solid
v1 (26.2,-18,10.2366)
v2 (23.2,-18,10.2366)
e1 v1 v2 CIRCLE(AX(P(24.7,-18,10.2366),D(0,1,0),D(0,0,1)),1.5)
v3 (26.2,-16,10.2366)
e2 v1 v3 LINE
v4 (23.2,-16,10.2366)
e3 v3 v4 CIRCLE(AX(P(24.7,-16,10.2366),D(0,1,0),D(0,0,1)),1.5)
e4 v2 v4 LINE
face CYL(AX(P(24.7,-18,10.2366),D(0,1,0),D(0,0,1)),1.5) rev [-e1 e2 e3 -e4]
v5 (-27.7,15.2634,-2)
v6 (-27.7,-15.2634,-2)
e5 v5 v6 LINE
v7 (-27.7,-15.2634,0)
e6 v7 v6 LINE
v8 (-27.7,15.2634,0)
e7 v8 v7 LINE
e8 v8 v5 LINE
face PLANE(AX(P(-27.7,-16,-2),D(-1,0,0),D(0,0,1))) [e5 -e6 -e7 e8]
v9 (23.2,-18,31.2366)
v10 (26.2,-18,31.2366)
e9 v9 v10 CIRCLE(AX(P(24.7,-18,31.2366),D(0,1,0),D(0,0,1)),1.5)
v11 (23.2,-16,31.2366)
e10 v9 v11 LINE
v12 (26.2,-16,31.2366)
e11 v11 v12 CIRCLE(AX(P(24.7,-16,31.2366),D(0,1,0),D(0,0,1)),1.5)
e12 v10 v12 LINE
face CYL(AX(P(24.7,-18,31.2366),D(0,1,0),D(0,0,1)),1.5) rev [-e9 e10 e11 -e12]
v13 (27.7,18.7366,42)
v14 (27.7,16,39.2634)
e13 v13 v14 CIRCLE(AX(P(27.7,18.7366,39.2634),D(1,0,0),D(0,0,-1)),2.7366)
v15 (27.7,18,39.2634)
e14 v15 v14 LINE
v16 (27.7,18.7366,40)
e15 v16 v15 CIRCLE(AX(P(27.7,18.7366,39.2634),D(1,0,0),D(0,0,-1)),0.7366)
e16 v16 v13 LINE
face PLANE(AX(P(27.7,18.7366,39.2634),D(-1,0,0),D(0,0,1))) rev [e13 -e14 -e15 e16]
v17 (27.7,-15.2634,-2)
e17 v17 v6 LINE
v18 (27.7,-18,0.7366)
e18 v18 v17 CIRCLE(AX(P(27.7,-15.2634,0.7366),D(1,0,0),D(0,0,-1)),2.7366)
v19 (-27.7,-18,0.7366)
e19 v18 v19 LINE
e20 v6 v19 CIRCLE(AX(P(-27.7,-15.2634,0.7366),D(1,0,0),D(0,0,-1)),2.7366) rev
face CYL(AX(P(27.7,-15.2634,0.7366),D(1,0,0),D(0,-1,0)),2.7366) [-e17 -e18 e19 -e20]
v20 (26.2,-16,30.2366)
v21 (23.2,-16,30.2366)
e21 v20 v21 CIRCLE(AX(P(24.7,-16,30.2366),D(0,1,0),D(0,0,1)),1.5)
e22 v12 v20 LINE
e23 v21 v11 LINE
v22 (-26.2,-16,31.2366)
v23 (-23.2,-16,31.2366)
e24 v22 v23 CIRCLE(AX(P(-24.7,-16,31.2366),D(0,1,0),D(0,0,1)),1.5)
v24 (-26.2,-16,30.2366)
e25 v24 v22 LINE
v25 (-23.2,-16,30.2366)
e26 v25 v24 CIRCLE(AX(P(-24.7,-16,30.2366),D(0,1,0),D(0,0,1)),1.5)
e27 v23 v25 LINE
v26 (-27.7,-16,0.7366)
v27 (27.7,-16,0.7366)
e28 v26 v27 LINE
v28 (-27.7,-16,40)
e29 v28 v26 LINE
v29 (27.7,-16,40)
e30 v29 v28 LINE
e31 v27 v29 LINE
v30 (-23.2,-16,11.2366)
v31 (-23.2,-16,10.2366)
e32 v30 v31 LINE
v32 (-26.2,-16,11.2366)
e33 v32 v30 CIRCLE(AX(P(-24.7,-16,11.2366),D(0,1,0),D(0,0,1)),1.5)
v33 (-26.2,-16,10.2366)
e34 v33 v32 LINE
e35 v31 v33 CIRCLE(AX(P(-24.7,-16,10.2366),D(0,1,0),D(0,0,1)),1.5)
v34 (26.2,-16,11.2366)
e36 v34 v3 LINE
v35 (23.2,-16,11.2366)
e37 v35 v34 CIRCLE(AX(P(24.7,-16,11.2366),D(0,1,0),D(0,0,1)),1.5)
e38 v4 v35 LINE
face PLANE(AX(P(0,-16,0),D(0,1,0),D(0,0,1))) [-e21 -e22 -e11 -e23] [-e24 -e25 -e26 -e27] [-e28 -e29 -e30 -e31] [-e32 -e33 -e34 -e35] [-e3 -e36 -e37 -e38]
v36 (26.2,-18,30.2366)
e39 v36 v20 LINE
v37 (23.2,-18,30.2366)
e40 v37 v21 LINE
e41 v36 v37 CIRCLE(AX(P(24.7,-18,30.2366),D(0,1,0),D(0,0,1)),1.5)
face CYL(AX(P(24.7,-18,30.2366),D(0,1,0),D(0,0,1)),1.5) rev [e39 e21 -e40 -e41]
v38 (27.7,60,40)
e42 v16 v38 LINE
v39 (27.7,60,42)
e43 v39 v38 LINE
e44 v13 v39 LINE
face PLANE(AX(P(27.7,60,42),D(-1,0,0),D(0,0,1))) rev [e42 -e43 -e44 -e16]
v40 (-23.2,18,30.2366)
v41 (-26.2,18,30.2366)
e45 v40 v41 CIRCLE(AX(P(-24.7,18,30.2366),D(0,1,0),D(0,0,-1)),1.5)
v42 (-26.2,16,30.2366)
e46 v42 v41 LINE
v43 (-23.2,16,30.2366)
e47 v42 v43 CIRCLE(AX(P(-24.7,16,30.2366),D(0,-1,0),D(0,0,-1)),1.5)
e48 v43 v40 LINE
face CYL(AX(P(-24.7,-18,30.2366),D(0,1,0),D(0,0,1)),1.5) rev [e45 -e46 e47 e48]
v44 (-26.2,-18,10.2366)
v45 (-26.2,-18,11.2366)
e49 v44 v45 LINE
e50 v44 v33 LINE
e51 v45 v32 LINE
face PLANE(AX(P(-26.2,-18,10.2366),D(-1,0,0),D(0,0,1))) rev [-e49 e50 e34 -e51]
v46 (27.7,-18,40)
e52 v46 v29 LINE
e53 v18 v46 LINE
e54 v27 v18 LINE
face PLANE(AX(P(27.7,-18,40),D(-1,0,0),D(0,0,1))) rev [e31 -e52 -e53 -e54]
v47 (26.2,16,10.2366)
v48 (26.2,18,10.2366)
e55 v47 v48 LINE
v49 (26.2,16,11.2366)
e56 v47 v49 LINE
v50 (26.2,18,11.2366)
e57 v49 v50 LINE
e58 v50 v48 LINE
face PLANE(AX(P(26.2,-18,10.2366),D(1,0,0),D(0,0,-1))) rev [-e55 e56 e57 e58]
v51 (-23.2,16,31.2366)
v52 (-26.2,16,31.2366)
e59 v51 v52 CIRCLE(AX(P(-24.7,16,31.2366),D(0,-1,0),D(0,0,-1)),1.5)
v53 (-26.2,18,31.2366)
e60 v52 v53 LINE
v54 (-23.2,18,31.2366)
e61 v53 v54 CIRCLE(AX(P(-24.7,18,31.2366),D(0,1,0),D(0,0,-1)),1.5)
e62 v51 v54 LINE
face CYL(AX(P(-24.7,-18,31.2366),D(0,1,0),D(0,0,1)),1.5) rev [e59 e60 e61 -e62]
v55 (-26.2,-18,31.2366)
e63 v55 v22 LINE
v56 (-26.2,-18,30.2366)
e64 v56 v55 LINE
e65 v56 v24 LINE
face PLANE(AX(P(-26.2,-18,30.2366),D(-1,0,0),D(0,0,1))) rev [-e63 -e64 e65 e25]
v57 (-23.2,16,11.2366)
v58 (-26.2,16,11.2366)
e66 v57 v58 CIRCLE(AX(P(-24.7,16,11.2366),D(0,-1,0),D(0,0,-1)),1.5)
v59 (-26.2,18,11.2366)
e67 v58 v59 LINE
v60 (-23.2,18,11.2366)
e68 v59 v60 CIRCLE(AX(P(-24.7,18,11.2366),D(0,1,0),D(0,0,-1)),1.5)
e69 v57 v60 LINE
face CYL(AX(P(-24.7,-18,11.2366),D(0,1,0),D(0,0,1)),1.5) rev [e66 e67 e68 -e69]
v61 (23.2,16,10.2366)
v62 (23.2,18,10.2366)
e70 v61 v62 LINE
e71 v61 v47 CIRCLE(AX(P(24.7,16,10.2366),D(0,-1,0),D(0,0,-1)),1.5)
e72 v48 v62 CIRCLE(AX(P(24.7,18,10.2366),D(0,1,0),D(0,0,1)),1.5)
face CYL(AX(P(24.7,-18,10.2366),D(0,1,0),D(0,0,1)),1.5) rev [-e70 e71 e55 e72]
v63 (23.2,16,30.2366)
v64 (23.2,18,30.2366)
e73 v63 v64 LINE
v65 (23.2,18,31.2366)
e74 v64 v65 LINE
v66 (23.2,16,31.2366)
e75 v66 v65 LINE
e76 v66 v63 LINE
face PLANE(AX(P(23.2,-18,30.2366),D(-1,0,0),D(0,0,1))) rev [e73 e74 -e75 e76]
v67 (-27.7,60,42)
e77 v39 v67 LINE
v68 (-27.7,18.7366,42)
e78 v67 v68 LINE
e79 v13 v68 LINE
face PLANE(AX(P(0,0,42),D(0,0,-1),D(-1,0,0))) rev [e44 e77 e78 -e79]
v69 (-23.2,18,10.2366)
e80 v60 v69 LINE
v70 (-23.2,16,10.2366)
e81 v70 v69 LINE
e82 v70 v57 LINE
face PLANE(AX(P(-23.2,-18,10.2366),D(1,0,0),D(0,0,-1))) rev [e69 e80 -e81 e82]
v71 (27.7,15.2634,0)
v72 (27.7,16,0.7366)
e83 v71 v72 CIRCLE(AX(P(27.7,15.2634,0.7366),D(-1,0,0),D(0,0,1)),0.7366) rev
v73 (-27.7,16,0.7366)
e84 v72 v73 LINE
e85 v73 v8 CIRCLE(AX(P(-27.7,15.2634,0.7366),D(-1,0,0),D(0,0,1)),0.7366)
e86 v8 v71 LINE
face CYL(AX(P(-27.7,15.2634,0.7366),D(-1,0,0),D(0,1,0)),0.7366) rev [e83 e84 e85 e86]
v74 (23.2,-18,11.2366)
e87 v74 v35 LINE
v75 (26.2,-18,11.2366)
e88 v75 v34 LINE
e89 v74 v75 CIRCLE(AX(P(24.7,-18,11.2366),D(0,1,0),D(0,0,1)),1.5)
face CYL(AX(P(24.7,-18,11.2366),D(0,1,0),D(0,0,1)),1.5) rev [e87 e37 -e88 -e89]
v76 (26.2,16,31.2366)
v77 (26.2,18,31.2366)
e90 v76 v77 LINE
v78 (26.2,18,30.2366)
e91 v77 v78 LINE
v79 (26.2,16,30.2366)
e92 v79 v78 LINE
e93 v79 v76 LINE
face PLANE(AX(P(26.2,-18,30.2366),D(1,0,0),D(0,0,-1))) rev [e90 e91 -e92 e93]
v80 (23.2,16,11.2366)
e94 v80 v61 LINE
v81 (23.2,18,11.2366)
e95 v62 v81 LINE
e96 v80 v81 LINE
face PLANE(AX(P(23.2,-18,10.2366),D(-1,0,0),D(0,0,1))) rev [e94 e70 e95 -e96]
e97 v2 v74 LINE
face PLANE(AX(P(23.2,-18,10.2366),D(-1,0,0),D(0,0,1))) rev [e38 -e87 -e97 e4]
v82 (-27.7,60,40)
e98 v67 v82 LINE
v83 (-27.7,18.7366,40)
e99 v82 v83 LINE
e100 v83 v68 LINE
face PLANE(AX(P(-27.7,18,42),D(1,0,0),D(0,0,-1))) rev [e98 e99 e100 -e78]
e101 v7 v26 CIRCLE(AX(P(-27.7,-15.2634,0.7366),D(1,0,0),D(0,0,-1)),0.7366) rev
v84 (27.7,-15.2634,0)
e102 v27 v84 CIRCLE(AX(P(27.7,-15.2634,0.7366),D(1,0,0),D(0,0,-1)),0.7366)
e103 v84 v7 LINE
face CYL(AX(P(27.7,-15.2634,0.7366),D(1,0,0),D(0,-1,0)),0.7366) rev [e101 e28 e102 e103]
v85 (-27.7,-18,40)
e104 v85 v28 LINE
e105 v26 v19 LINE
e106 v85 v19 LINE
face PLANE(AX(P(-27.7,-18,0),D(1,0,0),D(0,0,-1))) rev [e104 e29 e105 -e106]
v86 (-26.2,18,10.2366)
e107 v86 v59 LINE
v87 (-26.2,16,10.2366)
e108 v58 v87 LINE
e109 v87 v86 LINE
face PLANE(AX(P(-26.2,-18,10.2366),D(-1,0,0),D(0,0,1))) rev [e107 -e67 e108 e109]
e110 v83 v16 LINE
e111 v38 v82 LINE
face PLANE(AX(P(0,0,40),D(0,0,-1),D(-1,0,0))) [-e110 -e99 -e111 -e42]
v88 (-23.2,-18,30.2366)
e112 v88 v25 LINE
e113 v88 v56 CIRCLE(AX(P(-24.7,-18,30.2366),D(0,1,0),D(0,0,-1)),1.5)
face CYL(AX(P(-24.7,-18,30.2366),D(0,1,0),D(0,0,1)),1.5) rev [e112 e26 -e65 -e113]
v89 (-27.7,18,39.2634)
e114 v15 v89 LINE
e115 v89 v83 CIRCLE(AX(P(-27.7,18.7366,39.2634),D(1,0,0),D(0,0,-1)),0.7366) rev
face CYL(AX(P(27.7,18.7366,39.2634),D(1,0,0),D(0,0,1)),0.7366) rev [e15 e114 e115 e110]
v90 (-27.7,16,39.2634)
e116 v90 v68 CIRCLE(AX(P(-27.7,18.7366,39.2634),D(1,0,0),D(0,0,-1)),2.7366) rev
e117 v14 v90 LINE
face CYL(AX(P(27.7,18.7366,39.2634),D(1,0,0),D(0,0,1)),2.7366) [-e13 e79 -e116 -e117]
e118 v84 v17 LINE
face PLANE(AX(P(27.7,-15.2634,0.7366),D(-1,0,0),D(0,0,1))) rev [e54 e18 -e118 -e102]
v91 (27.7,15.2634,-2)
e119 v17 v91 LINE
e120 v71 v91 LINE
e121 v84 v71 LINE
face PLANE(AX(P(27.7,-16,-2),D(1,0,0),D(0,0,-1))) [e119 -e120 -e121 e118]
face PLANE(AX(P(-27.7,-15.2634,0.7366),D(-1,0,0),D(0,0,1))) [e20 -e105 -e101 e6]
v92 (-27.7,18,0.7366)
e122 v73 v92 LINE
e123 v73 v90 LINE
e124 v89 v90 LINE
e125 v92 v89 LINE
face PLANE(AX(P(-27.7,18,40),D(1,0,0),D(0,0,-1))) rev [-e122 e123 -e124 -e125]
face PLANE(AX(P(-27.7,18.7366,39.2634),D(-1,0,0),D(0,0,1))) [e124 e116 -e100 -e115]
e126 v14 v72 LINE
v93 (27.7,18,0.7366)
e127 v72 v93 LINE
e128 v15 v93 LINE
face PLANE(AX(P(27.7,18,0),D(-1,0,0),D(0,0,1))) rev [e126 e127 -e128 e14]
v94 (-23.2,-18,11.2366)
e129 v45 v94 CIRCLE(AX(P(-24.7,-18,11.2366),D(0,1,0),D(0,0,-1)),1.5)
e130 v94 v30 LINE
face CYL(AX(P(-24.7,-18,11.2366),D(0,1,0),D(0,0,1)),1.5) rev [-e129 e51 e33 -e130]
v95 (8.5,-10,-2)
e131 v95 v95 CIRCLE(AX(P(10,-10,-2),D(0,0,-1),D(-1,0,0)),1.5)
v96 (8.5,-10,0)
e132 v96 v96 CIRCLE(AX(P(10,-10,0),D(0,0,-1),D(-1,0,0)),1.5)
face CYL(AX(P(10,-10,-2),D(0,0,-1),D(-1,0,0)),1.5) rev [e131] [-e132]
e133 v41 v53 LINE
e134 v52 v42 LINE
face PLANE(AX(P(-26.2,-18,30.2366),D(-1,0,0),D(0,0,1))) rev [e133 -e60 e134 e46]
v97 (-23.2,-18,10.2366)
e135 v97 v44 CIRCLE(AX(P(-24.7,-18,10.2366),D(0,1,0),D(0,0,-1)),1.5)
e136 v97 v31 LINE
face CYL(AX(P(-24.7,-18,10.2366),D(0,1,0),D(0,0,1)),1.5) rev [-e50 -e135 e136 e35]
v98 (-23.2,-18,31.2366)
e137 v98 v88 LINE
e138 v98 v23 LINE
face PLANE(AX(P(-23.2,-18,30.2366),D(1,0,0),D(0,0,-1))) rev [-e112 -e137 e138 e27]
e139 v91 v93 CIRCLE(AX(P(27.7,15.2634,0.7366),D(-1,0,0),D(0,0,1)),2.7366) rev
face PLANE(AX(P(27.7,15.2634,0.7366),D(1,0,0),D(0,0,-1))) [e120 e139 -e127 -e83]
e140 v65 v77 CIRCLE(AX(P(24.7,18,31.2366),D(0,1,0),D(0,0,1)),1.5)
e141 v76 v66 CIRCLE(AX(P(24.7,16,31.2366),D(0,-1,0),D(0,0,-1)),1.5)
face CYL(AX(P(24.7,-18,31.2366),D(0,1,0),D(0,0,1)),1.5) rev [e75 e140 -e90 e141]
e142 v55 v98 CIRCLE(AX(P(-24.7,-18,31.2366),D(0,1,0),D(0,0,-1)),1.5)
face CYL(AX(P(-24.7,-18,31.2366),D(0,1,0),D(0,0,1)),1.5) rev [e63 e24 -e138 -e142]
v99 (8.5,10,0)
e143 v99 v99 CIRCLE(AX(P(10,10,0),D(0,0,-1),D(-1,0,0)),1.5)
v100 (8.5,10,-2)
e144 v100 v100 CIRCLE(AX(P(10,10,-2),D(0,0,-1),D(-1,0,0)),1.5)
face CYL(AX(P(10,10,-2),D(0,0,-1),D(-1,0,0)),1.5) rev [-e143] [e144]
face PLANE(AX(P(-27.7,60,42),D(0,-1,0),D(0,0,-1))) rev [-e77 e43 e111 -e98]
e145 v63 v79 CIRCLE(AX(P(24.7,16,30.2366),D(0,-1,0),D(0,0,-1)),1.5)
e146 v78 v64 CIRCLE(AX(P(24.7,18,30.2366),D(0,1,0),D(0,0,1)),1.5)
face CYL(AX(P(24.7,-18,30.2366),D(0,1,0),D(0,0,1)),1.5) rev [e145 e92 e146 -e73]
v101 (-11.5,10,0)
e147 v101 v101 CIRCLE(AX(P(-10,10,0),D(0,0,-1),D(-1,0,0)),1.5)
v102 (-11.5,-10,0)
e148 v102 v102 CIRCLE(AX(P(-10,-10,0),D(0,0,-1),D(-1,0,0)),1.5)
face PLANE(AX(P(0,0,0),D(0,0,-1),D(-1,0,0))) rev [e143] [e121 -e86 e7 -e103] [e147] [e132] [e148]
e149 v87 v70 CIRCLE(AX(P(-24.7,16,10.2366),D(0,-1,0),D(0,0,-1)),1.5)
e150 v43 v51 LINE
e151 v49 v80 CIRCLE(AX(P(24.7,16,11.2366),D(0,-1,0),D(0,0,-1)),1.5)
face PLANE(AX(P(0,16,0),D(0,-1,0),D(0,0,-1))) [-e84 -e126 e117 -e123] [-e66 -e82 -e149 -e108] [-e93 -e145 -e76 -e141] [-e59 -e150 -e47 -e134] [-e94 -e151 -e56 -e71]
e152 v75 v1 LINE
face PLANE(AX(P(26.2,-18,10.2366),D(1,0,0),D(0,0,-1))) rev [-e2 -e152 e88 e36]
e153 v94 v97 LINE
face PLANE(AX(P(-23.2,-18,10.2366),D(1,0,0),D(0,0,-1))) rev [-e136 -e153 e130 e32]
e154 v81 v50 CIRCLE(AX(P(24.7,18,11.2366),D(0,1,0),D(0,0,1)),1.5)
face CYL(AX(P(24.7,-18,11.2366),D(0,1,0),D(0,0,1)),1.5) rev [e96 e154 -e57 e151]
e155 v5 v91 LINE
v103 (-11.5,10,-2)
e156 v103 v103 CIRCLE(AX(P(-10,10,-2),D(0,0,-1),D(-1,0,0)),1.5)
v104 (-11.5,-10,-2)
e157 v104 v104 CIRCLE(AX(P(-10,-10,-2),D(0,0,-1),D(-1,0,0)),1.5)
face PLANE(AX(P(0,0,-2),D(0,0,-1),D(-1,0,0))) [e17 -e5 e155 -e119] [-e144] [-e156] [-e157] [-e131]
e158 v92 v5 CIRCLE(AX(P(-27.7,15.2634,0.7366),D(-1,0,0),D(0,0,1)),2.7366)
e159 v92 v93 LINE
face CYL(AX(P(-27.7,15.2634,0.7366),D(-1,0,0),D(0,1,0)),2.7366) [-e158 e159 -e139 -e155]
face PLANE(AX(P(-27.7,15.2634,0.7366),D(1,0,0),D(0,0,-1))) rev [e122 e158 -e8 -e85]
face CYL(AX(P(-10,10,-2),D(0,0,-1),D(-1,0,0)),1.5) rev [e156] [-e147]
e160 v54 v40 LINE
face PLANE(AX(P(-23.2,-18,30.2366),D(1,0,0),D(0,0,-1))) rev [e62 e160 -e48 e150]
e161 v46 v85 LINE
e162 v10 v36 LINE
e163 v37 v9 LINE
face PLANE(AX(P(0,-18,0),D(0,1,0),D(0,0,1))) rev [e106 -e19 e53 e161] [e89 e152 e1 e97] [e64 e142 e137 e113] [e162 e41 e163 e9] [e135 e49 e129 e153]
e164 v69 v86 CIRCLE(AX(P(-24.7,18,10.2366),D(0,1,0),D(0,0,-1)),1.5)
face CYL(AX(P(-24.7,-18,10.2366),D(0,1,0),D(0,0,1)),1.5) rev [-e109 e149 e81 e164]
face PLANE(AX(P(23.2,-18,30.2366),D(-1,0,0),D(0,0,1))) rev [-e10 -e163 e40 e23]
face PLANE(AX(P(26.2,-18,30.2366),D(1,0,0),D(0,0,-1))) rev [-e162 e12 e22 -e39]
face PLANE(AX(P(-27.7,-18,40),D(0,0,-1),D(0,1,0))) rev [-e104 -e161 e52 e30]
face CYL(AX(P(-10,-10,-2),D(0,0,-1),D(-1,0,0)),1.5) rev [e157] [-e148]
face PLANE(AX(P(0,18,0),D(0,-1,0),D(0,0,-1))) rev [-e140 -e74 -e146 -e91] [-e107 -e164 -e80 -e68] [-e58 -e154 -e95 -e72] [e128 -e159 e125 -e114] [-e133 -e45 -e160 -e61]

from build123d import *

# Parameters (mm, degrees)
SZKIC1_W                             = 55.4
SZKIC1_H                             = 32
ODGI_CIE_BAZOWE1_DEPTH               = 2
OTWORY_USTALAJ_CE_3_0MM1_D           = 3
OTWORY_USTALAJ_CE_3_0MM1_DEPTH       = 17
OTWORY_USTALAJ_CE_3_0MM1_TIP         = 0.901290929
ODGI_CIE_KRAW_DZI1_STRIP_W           = 9.4732
ODGI_CIE_KRAW_DZI1_STRIP_H           = 2
ODGI_CIE_KRAW_DZI1_STRIP_CUT_DEPTH   = 55.4
ODGI_CIE_KRAW_DZI1_STRIP_2_W         = 9.4732
ODGI_CIE_KRAW_DZI1_STRIP_2_H         = 2
ODGI_CIE_KRAW_DZI1_STRIP_CUT_2_DEPTH = 55.4
ODGI_CIE_KRAW_DZI1_DEPTH             = 55.4
ODGI_CIE_KRAW_DZI1_BEND_DEPTH        = 55.4
ODGI_CIE_KRAW_DZI2_STRIP_W           = 9.4732
ODGI_CIE_KRAW_DZI2_STRIP_H           = 2
ODGI_CIE_KRAW_DZI2_STRIP_CUT_DEPTH   = 55.4
ODGI_CIE_KRAW_DZI2_DEPTH             = 55.4
WYTNIJ_WYCI_GNI_CIE1_DEPTH           = 66.53846199


# Sheet-metal steps are written as plain solids
with BuildPart() as part:
    # Szkic1 → Odgięcie bazowe1 (new body)
    with BuildSketch(Plane.XY):
        Rectangle(SZKIC1_W, SZKIC1_H)
    extrude(amount=-ODGI_CIE_BAZOWE1_DEPTH)

    # Otwory ustalające Ø3.0mm1
    with Locations(Plane(origin=(0, 0, -2), x_dir=(-1, 0, 0), z_dir=(0, 0, -1))):
        with Locations((-10, 10), (10, 10), (10, -10), (-10, -10)):
            Hole(OTWORY_USTALAJ_CE_3_0MM1_D / 2, depth=OTWORY_USTALAJ_CE_3_0MM1_DEPTH)
            with Locations((0, 0, -(OTWORY_USTALAJ_CE_3_0MM1_DEPTH + OTWORY_USTALAJ_CE_3_0MM1_TIP / 2))):  # 118° drill point
                Cone(0, OTWORY_USTALAJ_CE_3_0MM1_D / 2, OTWORY_USTALAJ_CE_3_0MM1_TIP, mode=Mode.SUBTRACT)

    # Odgięcie krawędzi1 strip (across the edge) → Odgięcie krawędzi1 strip cut (cut)
    with BuildSketch(Plane(origin=(27.7, 16, 0), x_dir=(0, -1, 0), z_dir=(-1, 0, 0))):
        with Locations((-4, -1)):
            Rectangle(ODGI_CIE_KRAW_DZI1_STRIP_W, ODGI_CIE_KRAW_DZI1_STRIP_H)
    extrude(amount=ODGI_CIE_KRAW_DZI1_STRIP_CUT_DEPTH, mode=Mode.SUBTRACT)

    # Odgięcie krawędzi1 strip 2 (across the edge) → Odgięcie krawędzi1 strip cut 2 (cut)
    with BuildSketch(Plane(origin=(-27.7, -16, 0), x_dir=(0, 1, 0), z_dir=(1, 0, 0))):
        with Locations((-4, -1)):
            Rectangle(ODGI_CIE_KRAW_DZI1_STRIP_2_W, ODGI_CIE_KRAW_DZI1_STRIP_2_H)
    extrude(amount=ODGI_CIE_KRAW_DZI1_STRIP_CUT_2_DEPTH, mode=Mode.SUBTRACT)

    # Odgięcie krawędzi1 section (across the edge) → Odgięcie krawędzi1 (add)
    with BuildSketch(Plane(origin=(27.7, 16, 0), x_dir=(0, -1, 0), z_dir=(-1, 0, 0))):
        with BuildLine():
            Line((-2, 0.7366), (-2, 40))
            Line((-2, 40), (0, 40))
            Line((0, 40), (0, 0.7366))
            ThreePointArc((0, 0.7366), (0.215745145, 0.215745145), (0.7366, 0))
            Line((0.7366, 0), (0.7366, -2))
            ThreePointArc((0.7366, -2), (-1.198468417, -1.198468417), (-2, 0.7366))
        make_face()
    extrude(amount=ODGI_CIE_KRAW_DZI1_DEPTH)

    # Odgięcie krawędzi1 section 2 (across the edge) → Odgięcie krawędzi1 bend (add)
    with BuildSketch(Plane(origin=(-27.7, -16, 0), x_dir=(0, 1, 0), z_dir=(1, 0, 0))):
        with BuildLine():
            Line((-2, 0.7366), (-2, 40))
            Line((-2, 40), (0, 40))
            Line((0, 40), (0, 0.7366))
            ThreePointArc((0, 0.7366), (0.215745145, 0.215745145), (0.7366, 0))
            Line((0.7366, 0), (0.7366, -2))
            ThreePointArc((0.7366, -2), (-1.198468417, -1.198468417), (-2, 0.7366))
        make_face()
    extrude(amount=ODGI_CIE_KRAW_DZI1_BEND_DEPTH)

    # Odgięcie krawędzi2 strip (across the edge) → Odgięcie krawędzi2 strip cut (cut)
    with BuildSketch(Plane(origin=(-27.7, 18, 40), x_dir=(0, 0, -1), z_dir=(1, 0, 0))):
        with Locations((-4, -1)):
            Rectangle(ODGI_CIE_KRAW_DZI2_STRIP_W, ODGI_CIE_KRAW_DZI2_STRIP_H)
    extrude(amount=ODGI_CIE_KRAW_DZI2_STRIP_CUT_DEPTH, mode=Mode.SUBTRACT)

    # Odgięcie krawędzi2 section (across the edge) → Odgięcie krawędzi2 (add)
    with BuildSketch(Plane(origin=(-27.7, 18, 40), x_dir=(0, 0, -1), z_dir=(1, 0, 0))):
        with BuildLine():
            Line((-2, 0.7366), (-2, 42))
            Line((-2, 42), (0, 42))
            Line((0, 42), (0, 0.7366))
            ThreePointArc((0, 0.7366), (0.215745145, 0.215745145), (0.7366, 0))
            Line((0.7366, 0), (0.7366, -2))
            ThreePointArc((0.7366, -2), (-1.198468417, -1.198468417), (-2, 0.7366))
        make_face()
    extrude(amount=ODGI_CIE_KRAW_DZI2_DEPTH)

    # Szkic16 → Wytnij-wyciągnięcie1 (cut, through all)
    with BuildSketch(Plane(origin=(0, 18, 0), x_dir=(1, 0, 0), z_dir=(0, 1, 0))):
        with BuildLine():
            Line((26.2, -30.2366), (26.2, -31.2366))
            ThreePointArc((26.2, -31.2366), (24.7, -32.7366), (23.2, -31.2366))
            Line((23.2, -31.2366), (23.2, -30.2366))
            ThreePointArc((23.2, -30.2366), (24.7, -28.7366), (26.2, -30.2366))
        make_face()
        with BuildLine():
            Line((26.2, -10.2366), (26.2, -11.2366))
            ThreePointArc((26.2, -11.2366), (24.7, -12.7366), (23.2, -11.2366))
            Line((23.2, -11.2366), (23.2, -10.2366))
            ThreePointArc((23.2, -10.2366), (24.7, -8.7366), (26.2, -10.2366))
        make_face()
        with BuildLine():
            Line((-26.2, -10.2366), (-26.2, -11.2366))
            ThreePointArc((-26.2, -11.2366), (-24.7, -12.7366), (-23.2, -11.2366))
            Line((-23.2, -11.2366), (-23.2, -10.2366))
            ThreePointArc((-23.2, -10.2366), (-24.7, -8.7366), (-26.2, -10.2366))
        make_face()
        with BuildLine():
            Line((-26.2, -30.2366), (-26.2, -31.2366))
            ThreePointArc((-26.2, -31.2366), (-24.7, -32.7366), (-23.2, -31.2366))
            Line((-23.2, -31.2366), (-23.2, -30.2366))
            ThreePointArc((-23.2, -30.2366), (-24.7, -28.7366), (-26.2, -30.2366))
        make_face()
    extrude(amount=-WYTNIJ_WYCI_GNI_CIE1_DEPTH, mode=Mode.SUBTRACT)


solid = part.part
